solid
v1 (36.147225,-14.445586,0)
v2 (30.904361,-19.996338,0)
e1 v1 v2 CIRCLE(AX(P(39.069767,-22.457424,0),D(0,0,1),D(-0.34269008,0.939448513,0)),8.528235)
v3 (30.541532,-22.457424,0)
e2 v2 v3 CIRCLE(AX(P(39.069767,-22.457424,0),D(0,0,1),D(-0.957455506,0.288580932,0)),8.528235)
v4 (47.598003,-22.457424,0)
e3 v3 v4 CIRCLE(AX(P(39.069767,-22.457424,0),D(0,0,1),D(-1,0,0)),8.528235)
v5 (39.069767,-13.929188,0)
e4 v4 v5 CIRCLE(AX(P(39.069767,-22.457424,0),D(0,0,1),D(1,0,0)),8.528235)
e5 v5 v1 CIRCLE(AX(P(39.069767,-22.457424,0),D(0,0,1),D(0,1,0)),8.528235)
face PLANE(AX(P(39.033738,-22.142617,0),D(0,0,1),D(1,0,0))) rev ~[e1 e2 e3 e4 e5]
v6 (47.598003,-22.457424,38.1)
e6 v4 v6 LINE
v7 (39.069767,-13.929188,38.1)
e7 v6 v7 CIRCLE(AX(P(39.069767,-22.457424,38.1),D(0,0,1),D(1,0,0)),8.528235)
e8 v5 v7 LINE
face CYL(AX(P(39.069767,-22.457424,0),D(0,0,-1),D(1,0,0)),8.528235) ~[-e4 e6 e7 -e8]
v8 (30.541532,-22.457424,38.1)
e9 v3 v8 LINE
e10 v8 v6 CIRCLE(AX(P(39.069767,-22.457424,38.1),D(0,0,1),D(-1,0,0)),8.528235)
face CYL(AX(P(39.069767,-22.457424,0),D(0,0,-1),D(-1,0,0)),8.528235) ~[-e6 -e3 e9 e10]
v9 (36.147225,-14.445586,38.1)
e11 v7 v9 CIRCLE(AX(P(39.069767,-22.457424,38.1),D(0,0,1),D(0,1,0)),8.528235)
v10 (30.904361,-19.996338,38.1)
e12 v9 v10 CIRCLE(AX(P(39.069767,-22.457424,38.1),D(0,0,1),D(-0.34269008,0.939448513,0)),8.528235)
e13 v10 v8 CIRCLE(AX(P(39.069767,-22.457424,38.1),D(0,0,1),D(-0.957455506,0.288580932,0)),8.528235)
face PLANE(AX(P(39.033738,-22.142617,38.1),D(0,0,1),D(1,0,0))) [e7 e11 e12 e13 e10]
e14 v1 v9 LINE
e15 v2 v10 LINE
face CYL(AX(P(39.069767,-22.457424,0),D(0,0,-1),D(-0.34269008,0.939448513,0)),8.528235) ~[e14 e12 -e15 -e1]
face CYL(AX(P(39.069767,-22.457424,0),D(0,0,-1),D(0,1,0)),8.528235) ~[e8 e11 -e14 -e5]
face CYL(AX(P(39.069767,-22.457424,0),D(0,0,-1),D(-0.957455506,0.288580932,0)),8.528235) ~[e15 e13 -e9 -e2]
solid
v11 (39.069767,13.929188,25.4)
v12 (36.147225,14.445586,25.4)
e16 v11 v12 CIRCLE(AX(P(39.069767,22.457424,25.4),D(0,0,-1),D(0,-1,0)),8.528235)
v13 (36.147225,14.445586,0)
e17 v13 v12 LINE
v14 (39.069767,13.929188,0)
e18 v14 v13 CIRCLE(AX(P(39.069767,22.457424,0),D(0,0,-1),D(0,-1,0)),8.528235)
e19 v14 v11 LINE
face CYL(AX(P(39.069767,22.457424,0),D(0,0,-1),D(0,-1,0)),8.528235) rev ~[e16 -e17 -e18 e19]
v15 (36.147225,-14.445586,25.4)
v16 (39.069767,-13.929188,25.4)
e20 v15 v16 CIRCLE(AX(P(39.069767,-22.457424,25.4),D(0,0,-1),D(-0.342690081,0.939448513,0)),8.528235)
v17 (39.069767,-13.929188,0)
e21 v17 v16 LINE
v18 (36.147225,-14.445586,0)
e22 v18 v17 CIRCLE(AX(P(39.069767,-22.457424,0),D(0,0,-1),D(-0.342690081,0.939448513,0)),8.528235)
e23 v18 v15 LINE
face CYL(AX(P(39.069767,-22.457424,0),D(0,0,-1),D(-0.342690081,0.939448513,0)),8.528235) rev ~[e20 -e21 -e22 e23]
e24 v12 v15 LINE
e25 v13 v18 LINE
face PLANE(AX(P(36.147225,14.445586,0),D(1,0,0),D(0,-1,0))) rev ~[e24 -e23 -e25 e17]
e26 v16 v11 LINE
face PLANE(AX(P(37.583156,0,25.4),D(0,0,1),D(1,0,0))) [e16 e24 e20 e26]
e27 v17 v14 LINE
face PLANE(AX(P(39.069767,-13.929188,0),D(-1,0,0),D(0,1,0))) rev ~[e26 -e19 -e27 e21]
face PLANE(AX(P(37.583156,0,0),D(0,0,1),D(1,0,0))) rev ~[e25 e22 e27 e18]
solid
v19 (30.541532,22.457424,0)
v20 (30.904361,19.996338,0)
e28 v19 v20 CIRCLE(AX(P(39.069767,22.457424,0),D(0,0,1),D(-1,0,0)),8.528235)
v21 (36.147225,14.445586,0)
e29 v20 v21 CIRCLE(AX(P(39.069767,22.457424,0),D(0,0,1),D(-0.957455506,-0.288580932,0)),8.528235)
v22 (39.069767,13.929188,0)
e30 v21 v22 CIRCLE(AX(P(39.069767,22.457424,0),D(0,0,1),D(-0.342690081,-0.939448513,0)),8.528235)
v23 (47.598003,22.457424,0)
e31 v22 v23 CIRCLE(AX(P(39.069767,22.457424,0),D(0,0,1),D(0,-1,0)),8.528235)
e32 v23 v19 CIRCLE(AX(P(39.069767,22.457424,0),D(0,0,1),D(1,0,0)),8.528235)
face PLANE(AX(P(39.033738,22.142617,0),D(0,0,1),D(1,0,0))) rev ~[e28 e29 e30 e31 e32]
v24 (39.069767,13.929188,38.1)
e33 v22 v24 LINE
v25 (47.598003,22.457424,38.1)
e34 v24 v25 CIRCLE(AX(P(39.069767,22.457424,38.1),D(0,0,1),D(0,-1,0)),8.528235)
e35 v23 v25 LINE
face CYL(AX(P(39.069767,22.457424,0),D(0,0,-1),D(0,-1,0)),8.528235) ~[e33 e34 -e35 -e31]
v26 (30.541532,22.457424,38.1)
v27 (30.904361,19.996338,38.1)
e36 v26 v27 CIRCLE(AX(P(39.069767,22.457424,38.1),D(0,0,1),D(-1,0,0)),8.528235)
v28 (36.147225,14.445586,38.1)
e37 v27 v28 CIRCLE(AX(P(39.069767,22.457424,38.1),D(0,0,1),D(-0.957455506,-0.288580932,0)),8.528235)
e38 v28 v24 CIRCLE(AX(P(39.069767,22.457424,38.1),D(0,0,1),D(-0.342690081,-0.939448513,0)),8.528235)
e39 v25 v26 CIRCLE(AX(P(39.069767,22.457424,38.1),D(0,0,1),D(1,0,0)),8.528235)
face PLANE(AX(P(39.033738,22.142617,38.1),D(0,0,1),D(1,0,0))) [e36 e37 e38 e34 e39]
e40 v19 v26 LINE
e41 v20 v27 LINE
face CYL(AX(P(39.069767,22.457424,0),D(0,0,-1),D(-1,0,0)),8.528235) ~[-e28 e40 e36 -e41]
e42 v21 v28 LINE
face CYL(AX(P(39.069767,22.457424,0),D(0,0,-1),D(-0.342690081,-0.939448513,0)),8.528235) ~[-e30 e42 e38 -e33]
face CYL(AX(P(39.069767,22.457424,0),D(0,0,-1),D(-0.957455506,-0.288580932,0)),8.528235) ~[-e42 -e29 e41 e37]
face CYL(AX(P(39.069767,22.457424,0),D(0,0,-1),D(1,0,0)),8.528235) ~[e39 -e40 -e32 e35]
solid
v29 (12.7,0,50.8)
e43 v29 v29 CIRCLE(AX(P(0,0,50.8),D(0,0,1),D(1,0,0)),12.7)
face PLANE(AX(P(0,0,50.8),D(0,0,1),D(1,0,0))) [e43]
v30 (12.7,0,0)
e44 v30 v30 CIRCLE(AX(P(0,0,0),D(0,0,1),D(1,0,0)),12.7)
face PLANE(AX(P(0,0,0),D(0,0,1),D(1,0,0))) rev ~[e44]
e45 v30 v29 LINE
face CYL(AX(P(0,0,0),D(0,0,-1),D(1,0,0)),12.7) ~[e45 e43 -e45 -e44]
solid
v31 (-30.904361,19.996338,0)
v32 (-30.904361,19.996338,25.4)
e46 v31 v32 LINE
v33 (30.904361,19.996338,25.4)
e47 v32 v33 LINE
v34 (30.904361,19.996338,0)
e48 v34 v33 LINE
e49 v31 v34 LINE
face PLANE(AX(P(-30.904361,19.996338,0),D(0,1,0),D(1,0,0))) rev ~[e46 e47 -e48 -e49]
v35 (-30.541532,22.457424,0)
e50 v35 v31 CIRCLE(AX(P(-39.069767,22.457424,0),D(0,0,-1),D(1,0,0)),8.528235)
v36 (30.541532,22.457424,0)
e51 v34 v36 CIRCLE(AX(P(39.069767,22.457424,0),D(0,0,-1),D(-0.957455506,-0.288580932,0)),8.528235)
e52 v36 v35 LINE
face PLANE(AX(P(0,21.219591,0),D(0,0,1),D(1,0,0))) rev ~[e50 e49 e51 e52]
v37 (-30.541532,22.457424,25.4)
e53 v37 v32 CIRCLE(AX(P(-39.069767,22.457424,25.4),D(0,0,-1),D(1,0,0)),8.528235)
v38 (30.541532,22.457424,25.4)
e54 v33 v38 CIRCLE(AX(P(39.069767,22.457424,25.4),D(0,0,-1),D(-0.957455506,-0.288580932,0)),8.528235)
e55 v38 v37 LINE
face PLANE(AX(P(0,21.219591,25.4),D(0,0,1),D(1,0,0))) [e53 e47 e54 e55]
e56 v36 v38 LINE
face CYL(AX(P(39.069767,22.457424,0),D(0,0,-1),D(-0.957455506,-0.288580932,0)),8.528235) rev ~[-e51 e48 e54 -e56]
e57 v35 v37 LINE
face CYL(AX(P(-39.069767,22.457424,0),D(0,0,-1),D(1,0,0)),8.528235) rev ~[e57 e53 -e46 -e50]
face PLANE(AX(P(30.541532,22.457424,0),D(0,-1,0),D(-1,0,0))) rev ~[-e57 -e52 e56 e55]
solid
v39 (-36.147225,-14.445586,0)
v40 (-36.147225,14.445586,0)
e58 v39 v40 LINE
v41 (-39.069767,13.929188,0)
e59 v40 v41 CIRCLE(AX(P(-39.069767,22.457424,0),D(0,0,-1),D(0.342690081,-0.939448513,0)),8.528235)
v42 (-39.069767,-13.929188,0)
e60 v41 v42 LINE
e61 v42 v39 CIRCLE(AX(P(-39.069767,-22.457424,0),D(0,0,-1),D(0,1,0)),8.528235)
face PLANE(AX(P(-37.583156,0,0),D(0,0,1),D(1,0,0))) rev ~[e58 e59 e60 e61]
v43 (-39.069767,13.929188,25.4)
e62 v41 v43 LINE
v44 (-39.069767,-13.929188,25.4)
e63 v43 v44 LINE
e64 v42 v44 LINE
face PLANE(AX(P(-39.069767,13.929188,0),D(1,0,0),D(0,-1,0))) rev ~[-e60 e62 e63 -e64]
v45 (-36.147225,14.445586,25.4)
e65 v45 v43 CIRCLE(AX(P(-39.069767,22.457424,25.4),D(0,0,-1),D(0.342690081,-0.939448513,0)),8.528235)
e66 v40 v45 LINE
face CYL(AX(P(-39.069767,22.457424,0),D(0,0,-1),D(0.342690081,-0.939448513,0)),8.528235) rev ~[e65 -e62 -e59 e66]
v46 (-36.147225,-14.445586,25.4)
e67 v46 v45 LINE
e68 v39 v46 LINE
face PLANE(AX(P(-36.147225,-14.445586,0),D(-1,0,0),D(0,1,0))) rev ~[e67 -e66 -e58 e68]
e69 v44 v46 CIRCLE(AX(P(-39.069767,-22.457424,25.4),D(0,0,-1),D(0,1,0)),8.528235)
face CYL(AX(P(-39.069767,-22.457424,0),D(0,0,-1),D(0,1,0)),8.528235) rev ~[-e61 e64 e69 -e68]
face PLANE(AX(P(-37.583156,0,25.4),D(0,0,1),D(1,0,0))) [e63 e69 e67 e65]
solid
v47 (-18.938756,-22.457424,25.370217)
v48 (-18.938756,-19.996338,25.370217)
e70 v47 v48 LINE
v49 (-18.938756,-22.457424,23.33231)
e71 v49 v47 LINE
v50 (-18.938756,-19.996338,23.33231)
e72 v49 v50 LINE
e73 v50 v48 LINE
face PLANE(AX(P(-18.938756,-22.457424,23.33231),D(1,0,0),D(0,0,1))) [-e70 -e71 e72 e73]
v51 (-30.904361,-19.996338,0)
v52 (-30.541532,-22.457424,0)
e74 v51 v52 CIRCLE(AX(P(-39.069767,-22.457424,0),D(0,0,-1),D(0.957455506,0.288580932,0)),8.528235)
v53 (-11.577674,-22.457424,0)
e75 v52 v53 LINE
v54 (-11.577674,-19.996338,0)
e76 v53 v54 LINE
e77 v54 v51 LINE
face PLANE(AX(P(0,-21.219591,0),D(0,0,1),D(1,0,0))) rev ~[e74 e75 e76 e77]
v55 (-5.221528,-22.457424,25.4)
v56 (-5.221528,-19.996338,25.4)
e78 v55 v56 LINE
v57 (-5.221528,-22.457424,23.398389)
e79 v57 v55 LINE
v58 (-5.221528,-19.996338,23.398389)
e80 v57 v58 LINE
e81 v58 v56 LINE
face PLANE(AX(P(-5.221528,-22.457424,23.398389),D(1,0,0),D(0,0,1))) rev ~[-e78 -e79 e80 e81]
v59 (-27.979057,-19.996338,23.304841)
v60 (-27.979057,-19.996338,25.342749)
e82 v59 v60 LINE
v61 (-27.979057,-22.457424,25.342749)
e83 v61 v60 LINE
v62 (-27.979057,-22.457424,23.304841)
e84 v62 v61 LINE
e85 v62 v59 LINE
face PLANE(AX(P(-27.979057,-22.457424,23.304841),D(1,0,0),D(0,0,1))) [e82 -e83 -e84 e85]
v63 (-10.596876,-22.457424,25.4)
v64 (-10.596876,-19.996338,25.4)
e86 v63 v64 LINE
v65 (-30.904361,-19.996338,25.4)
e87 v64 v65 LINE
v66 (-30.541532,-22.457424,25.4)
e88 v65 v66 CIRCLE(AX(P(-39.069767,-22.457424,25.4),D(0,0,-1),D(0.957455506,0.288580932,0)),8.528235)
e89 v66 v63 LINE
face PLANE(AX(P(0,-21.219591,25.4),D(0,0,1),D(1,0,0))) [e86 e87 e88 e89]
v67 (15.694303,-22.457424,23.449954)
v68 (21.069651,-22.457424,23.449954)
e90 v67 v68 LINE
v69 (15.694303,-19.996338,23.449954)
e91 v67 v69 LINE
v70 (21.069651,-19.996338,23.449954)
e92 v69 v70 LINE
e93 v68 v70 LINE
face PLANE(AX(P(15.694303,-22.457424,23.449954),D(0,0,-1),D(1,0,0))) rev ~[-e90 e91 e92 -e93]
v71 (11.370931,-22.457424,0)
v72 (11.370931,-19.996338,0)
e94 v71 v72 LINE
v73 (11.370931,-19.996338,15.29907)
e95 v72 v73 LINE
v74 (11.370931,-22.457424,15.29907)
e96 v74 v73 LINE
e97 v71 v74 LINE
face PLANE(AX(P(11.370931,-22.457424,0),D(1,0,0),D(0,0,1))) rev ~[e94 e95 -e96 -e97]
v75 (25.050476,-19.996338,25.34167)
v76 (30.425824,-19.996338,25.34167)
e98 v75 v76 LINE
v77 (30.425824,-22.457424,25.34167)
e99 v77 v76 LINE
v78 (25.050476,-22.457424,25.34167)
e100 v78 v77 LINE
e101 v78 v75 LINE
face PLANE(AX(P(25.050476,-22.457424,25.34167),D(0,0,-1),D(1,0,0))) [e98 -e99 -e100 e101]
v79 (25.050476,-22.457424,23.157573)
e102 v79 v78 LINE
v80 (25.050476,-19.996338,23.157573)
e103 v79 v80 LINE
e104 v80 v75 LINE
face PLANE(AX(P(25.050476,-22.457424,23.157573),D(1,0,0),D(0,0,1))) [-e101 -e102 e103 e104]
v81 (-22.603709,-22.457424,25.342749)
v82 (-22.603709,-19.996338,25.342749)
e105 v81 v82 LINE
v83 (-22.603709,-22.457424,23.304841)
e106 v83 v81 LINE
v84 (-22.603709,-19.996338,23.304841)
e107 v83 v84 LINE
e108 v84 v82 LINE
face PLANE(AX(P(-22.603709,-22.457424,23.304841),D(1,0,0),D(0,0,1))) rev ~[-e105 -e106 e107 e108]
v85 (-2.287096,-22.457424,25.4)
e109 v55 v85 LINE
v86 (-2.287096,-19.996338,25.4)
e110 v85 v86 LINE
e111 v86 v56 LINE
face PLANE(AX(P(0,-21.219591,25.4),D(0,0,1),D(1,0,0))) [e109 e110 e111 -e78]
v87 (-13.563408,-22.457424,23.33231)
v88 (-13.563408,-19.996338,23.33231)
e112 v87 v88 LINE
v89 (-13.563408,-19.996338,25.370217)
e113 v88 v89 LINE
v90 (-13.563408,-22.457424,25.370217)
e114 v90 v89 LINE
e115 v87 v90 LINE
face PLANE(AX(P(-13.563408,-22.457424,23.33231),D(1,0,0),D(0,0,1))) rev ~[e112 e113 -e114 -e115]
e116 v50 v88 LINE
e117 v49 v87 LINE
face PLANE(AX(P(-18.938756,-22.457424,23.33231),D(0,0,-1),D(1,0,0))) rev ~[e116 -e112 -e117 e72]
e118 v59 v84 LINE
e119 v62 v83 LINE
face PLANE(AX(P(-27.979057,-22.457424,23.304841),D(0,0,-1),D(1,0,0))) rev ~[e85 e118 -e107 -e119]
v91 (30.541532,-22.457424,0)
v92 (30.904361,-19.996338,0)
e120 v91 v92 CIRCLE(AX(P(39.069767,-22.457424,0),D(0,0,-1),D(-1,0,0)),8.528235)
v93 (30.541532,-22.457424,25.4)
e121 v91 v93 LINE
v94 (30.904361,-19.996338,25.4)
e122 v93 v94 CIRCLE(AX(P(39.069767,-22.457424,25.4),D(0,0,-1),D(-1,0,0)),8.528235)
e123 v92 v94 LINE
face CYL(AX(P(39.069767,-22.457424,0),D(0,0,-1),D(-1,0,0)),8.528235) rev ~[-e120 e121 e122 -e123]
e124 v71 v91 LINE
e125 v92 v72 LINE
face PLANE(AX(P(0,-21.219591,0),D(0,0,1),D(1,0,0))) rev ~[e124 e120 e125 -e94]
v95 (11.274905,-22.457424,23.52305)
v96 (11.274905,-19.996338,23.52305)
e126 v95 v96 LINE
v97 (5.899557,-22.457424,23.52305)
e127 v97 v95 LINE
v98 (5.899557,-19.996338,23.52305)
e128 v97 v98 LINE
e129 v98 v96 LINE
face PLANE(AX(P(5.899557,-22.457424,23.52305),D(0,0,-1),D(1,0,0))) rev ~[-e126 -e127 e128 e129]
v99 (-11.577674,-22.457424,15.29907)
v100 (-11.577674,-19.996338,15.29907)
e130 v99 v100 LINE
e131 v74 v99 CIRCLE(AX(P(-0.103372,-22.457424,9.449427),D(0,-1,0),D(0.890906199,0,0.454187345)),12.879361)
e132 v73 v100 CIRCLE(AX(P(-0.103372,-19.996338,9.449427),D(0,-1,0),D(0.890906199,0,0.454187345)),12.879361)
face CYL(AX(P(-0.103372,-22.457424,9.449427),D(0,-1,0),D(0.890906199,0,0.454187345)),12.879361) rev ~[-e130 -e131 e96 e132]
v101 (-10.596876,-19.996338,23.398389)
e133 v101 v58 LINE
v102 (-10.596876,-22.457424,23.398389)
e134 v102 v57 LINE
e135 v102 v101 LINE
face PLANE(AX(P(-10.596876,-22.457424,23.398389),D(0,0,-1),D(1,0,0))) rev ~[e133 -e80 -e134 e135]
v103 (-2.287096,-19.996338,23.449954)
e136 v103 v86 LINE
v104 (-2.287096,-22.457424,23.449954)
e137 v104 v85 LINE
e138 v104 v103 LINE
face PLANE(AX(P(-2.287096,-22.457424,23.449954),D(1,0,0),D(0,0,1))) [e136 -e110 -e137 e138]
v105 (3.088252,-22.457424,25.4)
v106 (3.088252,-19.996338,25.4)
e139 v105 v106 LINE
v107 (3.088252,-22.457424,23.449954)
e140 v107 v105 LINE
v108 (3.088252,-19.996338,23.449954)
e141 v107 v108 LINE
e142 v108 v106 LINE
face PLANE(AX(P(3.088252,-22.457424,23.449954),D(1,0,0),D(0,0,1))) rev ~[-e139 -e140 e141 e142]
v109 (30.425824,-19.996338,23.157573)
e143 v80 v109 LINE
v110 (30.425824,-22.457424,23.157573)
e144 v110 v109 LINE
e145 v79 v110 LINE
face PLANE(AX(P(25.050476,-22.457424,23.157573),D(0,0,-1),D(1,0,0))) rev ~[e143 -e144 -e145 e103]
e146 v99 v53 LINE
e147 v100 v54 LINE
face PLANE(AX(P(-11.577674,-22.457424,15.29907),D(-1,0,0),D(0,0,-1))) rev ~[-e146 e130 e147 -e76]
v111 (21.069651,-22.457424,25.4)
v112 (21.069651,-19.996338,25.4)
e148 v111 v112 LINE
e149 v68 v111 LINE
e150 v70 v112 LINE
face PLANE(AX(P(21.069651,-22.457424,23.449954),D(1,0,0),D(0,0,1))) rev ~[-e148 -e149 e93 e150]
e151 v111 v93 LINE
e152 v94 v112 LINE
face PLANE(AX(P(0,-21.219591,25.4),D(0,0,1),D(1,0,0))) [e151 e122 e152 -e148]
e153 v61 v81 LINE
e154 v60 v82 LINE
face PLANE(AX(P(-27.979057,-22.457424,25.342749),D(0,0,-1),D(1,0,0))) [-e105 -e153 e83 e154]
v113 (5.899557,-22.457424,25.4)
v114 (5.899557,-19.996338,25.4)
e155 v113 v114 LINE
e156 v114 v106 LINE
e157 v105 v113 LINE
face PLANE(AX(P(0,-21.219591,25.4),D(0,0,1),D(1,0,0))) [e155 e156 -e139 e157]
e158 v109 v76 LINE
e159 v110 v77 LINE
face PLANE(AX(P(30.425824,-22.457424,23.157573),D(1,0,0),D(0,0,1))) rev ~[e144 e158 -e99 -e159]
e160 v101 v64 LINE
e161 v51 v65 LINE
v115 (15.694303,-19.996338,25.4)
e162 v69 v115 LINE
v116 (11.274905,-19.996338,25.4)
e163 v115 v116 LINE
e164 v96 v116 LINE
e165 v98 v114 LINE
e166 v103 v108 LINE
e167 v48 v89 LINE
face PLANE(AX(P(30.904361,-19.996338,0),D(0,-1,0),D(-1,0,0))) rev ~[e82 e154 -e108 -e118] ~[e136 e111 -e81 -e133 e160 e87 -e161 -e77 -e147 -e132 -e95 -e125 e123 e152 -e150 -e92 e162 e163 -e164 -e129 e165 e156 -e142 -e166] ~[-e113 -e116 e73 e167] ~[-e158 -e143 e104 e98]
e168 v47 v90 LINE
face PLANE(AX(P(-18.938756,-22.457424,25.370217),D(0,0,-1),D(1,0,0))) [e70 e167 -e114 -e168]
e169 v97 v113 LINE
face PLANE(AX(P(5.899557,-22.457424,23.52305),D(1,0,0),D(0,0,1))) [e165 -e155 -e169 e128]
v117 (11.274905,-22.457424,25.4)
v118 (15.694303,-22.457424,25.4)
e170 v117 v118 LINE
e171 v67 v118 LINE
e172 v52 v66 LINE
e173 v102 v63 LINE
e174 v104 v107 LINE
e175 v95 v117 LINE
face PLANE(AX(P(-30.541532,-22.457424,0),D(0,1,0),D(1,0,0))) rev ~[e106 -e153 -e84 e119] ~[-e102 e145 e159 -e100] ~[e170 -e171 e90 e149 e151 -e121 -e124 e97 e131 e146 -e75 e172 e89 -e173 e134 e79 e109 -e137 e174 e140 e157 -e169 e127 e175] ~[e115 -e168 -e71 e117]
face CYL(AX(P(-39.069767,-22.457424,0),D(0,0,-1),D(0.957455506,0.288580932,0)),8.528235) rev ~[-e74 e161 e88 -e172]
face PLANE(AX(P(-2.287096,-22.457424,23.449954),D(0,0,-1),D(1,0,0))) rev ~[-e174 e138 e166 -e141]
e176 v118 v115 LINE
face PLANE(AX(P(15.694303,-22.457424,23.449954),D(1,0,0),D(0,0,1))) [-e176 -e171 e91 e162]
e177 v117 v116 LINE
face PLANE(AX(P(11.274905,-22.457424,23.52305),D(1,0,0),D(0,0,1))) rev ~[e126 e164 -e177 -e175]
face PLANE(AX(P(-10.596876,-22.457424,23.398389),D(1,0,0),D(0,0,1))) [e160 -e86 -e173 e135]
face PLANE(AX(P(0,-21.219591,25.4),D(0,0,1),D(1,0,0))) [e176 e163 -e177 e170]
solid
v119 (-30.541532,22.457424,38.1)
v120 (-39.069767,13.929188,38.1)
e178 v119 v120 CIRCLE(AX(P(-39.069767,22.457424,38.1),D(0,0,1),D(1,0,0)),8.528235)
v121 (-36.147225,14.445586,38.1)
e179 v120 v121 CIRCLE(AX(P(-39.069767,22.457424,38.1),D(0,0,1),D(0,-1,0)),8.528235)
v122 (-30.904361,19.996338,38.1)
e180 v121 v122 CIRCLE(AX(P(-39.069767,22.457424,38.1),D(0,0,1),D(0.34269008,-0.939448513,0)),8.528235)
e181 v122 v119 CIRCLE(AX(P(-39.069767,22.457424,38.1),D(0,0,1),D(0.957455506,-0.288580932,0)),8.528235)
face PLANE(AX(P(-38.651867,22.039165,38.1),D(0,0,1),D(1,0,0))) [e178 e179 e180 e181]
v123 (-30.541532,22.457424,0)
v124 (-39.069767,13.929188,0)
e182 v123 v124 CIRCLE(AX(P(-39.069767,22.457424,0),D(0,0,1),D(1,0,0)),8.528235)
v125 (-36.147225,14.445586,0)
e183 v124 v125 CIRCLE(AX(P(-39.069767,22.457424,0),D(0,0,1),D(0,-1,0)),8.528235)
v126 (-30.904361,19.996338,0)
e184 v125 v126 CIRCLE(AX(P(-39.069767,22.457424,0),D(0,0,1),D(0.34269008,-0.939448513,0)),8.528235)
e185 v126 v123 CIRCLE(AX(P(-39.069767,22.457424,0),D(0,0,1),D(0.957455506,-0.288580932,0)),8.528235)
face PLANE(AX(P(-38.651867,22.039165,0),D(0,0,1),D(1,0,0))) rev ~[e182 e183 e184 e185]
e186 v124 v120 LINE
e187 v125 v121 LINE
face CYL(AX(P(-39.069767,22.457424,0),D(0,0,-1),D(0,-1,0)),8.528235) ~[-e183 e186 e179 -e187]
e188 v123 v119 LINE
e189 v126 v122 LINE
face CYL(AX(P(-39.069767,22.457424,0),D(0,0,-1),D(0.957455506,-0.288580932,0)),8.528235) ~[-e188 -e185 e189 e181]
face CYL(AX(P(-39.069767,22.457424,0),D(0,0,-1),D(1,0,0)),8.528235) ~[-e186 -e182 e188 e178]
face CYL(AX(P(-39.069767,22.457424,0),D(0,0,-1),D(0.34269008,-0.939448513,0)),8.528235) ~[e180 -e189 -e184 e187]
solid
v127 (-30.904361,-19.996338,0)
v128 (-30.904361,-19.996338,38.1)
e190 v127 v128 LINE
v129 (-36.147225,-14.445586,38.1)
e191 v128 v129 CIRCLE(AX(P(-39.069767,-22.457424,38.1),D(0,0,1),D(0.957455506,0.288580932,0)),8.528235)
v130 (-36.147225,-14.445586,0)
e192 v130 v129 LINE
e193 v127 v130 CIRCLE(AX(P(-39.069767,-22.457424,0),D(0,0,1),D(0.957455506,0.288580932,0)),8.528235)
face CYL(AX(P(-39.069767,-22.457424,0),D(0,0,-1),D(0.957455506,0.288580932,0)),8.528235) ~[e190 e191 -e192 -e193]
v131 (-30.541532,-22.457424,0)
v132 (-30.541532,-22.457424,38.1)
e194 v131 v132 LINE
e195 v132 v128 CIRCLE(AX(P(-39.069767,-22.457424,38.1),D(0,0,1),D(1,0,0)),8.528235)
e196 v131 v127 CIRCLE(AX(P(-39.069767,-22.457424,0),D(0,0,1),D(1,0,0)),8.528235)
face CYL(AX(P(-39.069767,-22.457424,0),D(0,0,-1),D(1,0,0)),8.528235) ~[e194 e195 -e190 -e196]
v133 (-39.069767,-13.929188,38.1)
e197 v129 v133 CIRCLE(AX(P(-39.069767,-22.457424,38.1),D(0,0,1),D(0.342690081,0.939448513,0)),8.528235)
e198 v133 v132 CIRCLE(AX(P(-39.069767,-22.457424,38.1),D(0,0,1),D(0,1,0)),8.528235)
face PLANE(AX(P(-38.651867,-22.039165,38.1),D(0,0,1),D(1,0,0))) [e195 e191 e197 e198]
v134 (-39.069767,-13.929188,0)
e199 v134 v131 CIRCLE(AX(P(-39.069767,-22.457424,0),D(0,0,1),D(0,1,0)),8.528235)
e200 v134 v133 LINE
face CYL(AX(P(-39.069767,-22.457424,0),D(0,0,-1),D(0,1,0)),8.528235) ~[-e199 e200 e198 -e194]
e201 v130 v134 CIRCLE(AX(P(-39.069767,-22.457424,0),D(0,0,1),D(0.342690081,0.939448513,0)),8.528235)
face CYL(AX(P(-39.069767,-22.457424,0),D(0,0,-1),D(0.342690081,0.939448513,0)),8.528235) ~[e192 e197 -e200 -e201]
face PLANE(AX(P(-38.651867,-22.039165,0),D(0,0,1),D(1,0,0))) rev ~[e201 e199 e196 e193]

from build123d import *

# Parameters (mm, degrees)
F1_DEPTH = 25.4
F2_DEPTH = 38.1
F0_R     = 12.7
F3_DEPTH = 50.8
F4_W     = 5.3753480315
F4_H     = 2.0379073262
F4_H_2   = 2.001611045
F4_H_3   = 1.9500455767
F4_H_4   = 1.8769497931
F4_H_5   = 2.1840970308
F4_H_6   = 2.4033825189
F5_DEPTH = 25.4


with BuildPart() as f1:
    # F0 (on Top) → F1 (new body)
    with BuildSketch(Plane.XY):
        with BuildLine():
            ThreePointArc((30.9043610914, 19.9963377189), (30.6327265804, 21.213579998), (30.5415316269, 22.4574238604))
            Line((30.5415316269, 22.4574238604), (-30.5415316269, 22.4574238604))
            ThreePointArc((-30.5415316269, 22.4574238604), (-30.6327265804, 21.213579998), (-30.9043610914, 19.9963377189))
            Line((-30.9043610914, 19.9963377189), (30.9043610914, 19.9963377189))
        make_face()
    extrude(amount=F1_DEPTH)


with BuildPart() as f1b:
    # F0 (on Top) → F1, piece 2 (new body)
    with BuildSketch(Plane.XY):
        with BuildLine():
            ThreePointArc((-36.1472253967, 14.4455857303), (-37.585860411, 14.059279949), (-39.0697670953, 13.929188392))
            Line((-39.0697670953, 13.929188392), (-39.0697670953, -13.929188392))
            ThreePointArc((-39.0697670953, -13.929188392), (-37.585860411, -14.059279949), (-36.1472253967, -14.4455857303))
            Line((-36.1472253967, -14.4455857303), (-36.1472253967, 14.4455857303))
        make_face()
    extrude(amount=F1_DEPTH)


with BuildPart() as f1c:
    # F0 (on Top) → F1, piece 3 (new body)
    with BuildSketch(Plane.XY):
        with BuildLine():
            ThreePointArc((-30.9043610914, -19.9963377189), (-30.6327265804, -21.213579998), (-30.5415316269, -22.4574238604))
            Line((-30.5415316269, -22.4574238604), (30.5415316269, -22.4574238604))
            ThreePointArc((30.5415316269, -22.4574238604), (30.6327265804, -21.213579998), (30.9043610914, -19.9963377189))
            Line((30.9043610914, -19.9963377189), (-30.9043610914, -19.9963377189))
        make_face()
    extrude(amount=F1_DEPTH)

    # F4 (on face) → F5 (cut)
    with BuildSketch(Plane.XZ.offset(22.4574238604)):
        with BuildLine():
            Line((-11.5776741877, 15.2990696952), (-11.5776741877, 0))
            Line((-11.5776741877, 0), (11.3709308207, 0))
            Line((11.3709308207, 0), (11.3709308207, 15.2990696952))
            ThreePointArc((11.3709308207, 15.2990696952), (-0.1033716835, 22.3287878897), (-11.5776741877, 15.2990696952))
        make_face()
        with Locations((-34.3195348978, 24.3810463369)):
            Rectangle(F4_W, F4_H)
        with Locations((-25.2913832664, 24.3237949908)):
            Rectangle(F4_W, F4_H)
        with Locations((-16.2510816008, 24.3512634188)):
            Rectangle(F4_W, F4_H)
        with Locations((-7.9092020169, 24.3991944775)):
            Rectangle(F4_W, F4_H_2)
        with Locations((0.400578283, 24.4249772117)):
            Rectangle(F4_W, F4_H_3)
        with Locations((8.5872309282, 24.4615251034)):
            Rectangle(F4_W, F4_H_4)
        with Locations((18.3819765225, 24.4249772117)):
            Rectangle(F4_W, F4_H_3)
        with Locations((27.7381502092, 24.249621667)):
            Rectangle(F4_W, F4_H_5)
        with Locations((37.9714630544, 24.3592662737)):
            Rectangle(F4_W, F4_H_6)
    extrude(amount=-F5_DEPTH, mode=Mode.SUBTRACT)


with BuildPart() as f1d:
    # F0 (on Top) → F1, piece 4 (new body)
    with BuildSketch(Plane.XY):
        with BuildLine():
            Line((39.0697670953, -13.929188392), (39.0697670953, 13.929188392))
            ThreePointArc((39.0697670953, 13.929188392), (37.585860411, 14.059279949), (36.1472253967, 14.4455857303))
            Line((36.1472253967, 14.4455857303), (36.1472253967, -14.4455857303))
            ThreePointArc((36.1472253967, -14.4455857303), (37.585860411, -14.059279949), (39.0697670953, -13.929188392))
        make_face()
    extrude(amount=F1_DEPTH)


with BuildPart() as f2:
    # F0 (on Top) → F2 (new body)
    with BuildSketch(Plane.XY):
        with BuildLine():
            ThreePointArc((47.5980025637, 22.4574238604), (39.0697670953, 30.9856593288), (30.5415316269, 22.4574238604))
            ThreePointArc((30.5415316269, 22.4574238604), (30.6327265804, 21.213579998), (30.9043610914, 19.9963377189))
            ThreePointArc((30.9043610914, 19.9963377189), (32.8698995183, 16.6014489432), (36.1472253967, 14.4455857303))
            ThreePointArc((36.1472253967, 14.4455857303), (37.585860411, 14.059279949), (39.0697670953, 13.929188392))
            ThreePointArc((39.0697670953, 13.929188392), (45.1001402266, 16.4270507292), (47.5980025637, 22.4574238604))
        make_face()
    extrude(amount=F2_DEPTH)


with BuildPart() as f2b:
    # F0 (on Top) → F2, piece 2 (new body)
    with BuildSketch(Plane.XY):
        with BuildLine():
            ThreePointArc((47.5980025637, -22.4574238604), (45.1001402266, -16.4270507292), (39.0697670953, -13.929188392))
            ThreePointArc((39.0697670953, -13.929188392), (37.585860411, -14.059279949), (36.1472253967, -14.4455857303))
            ThreePointArc((36.1472253967, -14.4455857303), (32.8698995183, -16.6014489432), (30.9043610914, -19.9963377189))
            ThreePointArc((30.9043610914, -19.9963377189), (30.6327265804, -21.213579998), (30.5415316269, -22.4574238604))
            ThreePointArc((30.5415316269, -22.4574238604), (39.0697670953, -30.9856593288), (47.5980025637, -22.4574238604))
        make_face()
    extrude(amount=F2_DEPTH)


with BuildPart() as f2c:
    # F0 (on Top) → F2, piece 3 (new body)
    with BuildSketch(Plane.XY):
        with BuildLine():
            ThreePointArc((-36.1472253967, -14.4455857303), (-37.585860411, -14.059279949), (-39.0697670953, -13.929188392))
            ThreePointArc((-39.0697670953, -13.929188392), (-45.1001402266, -28.4877969917), (-30.5415316269, -22.4574238604))
            ThreePointArc((-30.5415316269, -22.4574238604), (-30.6327265804, -21.213579998), (-30.9043610914, -19.9963377189))
            ThreePointArc((-30.9043610914, -19.9963377189), (-32.8698995183, -16.6014489432), (-36.1472253967, -14.4455857303))
        make_face()
    extrude(amount=F2_DEPTH)


with BuildPart() as f2d:
    # F0 (on Top) → F2, piece 4 (new body)
    with BuildSketch(Plane.XY):
        with BuildLine():
            ThreePointArc((-30.9043610914, 19.9963377189), (-30.6327265804, 21.213579998), (-30.5415316269, 22.4574238604))
            ThreePointArc((-30.5415316269, 22.4574238604), (-45.1001402266, 28.4877969917), (-39.0697670953, 13.929188392))
            ThreePointArc((-39.0697670953, 13.929188392), (-37.585860411, 14.059279949), (-36.1472253967, 14.4455857303))
            ThreePointArc((-36.1472253967, 14.4455857303), (-32.8698995183, 16.6014489432), (-30.9043610914, 19.9963377189))
        make_face()
    extrude(amount=F2_DEPTH)


with BuildPart() as f3:
    # F0 (on Top) → F3 (new body)
    with BuildSketch(Plane.XY):
        Circle(F0_R)
    extrude(amount=F3_DEPTH)


solid = Compound([f1.part, f1b.part, f1c.part, f1d.part, f2.part, f2b.part, f2c.part, f2d.part, f3.part])
